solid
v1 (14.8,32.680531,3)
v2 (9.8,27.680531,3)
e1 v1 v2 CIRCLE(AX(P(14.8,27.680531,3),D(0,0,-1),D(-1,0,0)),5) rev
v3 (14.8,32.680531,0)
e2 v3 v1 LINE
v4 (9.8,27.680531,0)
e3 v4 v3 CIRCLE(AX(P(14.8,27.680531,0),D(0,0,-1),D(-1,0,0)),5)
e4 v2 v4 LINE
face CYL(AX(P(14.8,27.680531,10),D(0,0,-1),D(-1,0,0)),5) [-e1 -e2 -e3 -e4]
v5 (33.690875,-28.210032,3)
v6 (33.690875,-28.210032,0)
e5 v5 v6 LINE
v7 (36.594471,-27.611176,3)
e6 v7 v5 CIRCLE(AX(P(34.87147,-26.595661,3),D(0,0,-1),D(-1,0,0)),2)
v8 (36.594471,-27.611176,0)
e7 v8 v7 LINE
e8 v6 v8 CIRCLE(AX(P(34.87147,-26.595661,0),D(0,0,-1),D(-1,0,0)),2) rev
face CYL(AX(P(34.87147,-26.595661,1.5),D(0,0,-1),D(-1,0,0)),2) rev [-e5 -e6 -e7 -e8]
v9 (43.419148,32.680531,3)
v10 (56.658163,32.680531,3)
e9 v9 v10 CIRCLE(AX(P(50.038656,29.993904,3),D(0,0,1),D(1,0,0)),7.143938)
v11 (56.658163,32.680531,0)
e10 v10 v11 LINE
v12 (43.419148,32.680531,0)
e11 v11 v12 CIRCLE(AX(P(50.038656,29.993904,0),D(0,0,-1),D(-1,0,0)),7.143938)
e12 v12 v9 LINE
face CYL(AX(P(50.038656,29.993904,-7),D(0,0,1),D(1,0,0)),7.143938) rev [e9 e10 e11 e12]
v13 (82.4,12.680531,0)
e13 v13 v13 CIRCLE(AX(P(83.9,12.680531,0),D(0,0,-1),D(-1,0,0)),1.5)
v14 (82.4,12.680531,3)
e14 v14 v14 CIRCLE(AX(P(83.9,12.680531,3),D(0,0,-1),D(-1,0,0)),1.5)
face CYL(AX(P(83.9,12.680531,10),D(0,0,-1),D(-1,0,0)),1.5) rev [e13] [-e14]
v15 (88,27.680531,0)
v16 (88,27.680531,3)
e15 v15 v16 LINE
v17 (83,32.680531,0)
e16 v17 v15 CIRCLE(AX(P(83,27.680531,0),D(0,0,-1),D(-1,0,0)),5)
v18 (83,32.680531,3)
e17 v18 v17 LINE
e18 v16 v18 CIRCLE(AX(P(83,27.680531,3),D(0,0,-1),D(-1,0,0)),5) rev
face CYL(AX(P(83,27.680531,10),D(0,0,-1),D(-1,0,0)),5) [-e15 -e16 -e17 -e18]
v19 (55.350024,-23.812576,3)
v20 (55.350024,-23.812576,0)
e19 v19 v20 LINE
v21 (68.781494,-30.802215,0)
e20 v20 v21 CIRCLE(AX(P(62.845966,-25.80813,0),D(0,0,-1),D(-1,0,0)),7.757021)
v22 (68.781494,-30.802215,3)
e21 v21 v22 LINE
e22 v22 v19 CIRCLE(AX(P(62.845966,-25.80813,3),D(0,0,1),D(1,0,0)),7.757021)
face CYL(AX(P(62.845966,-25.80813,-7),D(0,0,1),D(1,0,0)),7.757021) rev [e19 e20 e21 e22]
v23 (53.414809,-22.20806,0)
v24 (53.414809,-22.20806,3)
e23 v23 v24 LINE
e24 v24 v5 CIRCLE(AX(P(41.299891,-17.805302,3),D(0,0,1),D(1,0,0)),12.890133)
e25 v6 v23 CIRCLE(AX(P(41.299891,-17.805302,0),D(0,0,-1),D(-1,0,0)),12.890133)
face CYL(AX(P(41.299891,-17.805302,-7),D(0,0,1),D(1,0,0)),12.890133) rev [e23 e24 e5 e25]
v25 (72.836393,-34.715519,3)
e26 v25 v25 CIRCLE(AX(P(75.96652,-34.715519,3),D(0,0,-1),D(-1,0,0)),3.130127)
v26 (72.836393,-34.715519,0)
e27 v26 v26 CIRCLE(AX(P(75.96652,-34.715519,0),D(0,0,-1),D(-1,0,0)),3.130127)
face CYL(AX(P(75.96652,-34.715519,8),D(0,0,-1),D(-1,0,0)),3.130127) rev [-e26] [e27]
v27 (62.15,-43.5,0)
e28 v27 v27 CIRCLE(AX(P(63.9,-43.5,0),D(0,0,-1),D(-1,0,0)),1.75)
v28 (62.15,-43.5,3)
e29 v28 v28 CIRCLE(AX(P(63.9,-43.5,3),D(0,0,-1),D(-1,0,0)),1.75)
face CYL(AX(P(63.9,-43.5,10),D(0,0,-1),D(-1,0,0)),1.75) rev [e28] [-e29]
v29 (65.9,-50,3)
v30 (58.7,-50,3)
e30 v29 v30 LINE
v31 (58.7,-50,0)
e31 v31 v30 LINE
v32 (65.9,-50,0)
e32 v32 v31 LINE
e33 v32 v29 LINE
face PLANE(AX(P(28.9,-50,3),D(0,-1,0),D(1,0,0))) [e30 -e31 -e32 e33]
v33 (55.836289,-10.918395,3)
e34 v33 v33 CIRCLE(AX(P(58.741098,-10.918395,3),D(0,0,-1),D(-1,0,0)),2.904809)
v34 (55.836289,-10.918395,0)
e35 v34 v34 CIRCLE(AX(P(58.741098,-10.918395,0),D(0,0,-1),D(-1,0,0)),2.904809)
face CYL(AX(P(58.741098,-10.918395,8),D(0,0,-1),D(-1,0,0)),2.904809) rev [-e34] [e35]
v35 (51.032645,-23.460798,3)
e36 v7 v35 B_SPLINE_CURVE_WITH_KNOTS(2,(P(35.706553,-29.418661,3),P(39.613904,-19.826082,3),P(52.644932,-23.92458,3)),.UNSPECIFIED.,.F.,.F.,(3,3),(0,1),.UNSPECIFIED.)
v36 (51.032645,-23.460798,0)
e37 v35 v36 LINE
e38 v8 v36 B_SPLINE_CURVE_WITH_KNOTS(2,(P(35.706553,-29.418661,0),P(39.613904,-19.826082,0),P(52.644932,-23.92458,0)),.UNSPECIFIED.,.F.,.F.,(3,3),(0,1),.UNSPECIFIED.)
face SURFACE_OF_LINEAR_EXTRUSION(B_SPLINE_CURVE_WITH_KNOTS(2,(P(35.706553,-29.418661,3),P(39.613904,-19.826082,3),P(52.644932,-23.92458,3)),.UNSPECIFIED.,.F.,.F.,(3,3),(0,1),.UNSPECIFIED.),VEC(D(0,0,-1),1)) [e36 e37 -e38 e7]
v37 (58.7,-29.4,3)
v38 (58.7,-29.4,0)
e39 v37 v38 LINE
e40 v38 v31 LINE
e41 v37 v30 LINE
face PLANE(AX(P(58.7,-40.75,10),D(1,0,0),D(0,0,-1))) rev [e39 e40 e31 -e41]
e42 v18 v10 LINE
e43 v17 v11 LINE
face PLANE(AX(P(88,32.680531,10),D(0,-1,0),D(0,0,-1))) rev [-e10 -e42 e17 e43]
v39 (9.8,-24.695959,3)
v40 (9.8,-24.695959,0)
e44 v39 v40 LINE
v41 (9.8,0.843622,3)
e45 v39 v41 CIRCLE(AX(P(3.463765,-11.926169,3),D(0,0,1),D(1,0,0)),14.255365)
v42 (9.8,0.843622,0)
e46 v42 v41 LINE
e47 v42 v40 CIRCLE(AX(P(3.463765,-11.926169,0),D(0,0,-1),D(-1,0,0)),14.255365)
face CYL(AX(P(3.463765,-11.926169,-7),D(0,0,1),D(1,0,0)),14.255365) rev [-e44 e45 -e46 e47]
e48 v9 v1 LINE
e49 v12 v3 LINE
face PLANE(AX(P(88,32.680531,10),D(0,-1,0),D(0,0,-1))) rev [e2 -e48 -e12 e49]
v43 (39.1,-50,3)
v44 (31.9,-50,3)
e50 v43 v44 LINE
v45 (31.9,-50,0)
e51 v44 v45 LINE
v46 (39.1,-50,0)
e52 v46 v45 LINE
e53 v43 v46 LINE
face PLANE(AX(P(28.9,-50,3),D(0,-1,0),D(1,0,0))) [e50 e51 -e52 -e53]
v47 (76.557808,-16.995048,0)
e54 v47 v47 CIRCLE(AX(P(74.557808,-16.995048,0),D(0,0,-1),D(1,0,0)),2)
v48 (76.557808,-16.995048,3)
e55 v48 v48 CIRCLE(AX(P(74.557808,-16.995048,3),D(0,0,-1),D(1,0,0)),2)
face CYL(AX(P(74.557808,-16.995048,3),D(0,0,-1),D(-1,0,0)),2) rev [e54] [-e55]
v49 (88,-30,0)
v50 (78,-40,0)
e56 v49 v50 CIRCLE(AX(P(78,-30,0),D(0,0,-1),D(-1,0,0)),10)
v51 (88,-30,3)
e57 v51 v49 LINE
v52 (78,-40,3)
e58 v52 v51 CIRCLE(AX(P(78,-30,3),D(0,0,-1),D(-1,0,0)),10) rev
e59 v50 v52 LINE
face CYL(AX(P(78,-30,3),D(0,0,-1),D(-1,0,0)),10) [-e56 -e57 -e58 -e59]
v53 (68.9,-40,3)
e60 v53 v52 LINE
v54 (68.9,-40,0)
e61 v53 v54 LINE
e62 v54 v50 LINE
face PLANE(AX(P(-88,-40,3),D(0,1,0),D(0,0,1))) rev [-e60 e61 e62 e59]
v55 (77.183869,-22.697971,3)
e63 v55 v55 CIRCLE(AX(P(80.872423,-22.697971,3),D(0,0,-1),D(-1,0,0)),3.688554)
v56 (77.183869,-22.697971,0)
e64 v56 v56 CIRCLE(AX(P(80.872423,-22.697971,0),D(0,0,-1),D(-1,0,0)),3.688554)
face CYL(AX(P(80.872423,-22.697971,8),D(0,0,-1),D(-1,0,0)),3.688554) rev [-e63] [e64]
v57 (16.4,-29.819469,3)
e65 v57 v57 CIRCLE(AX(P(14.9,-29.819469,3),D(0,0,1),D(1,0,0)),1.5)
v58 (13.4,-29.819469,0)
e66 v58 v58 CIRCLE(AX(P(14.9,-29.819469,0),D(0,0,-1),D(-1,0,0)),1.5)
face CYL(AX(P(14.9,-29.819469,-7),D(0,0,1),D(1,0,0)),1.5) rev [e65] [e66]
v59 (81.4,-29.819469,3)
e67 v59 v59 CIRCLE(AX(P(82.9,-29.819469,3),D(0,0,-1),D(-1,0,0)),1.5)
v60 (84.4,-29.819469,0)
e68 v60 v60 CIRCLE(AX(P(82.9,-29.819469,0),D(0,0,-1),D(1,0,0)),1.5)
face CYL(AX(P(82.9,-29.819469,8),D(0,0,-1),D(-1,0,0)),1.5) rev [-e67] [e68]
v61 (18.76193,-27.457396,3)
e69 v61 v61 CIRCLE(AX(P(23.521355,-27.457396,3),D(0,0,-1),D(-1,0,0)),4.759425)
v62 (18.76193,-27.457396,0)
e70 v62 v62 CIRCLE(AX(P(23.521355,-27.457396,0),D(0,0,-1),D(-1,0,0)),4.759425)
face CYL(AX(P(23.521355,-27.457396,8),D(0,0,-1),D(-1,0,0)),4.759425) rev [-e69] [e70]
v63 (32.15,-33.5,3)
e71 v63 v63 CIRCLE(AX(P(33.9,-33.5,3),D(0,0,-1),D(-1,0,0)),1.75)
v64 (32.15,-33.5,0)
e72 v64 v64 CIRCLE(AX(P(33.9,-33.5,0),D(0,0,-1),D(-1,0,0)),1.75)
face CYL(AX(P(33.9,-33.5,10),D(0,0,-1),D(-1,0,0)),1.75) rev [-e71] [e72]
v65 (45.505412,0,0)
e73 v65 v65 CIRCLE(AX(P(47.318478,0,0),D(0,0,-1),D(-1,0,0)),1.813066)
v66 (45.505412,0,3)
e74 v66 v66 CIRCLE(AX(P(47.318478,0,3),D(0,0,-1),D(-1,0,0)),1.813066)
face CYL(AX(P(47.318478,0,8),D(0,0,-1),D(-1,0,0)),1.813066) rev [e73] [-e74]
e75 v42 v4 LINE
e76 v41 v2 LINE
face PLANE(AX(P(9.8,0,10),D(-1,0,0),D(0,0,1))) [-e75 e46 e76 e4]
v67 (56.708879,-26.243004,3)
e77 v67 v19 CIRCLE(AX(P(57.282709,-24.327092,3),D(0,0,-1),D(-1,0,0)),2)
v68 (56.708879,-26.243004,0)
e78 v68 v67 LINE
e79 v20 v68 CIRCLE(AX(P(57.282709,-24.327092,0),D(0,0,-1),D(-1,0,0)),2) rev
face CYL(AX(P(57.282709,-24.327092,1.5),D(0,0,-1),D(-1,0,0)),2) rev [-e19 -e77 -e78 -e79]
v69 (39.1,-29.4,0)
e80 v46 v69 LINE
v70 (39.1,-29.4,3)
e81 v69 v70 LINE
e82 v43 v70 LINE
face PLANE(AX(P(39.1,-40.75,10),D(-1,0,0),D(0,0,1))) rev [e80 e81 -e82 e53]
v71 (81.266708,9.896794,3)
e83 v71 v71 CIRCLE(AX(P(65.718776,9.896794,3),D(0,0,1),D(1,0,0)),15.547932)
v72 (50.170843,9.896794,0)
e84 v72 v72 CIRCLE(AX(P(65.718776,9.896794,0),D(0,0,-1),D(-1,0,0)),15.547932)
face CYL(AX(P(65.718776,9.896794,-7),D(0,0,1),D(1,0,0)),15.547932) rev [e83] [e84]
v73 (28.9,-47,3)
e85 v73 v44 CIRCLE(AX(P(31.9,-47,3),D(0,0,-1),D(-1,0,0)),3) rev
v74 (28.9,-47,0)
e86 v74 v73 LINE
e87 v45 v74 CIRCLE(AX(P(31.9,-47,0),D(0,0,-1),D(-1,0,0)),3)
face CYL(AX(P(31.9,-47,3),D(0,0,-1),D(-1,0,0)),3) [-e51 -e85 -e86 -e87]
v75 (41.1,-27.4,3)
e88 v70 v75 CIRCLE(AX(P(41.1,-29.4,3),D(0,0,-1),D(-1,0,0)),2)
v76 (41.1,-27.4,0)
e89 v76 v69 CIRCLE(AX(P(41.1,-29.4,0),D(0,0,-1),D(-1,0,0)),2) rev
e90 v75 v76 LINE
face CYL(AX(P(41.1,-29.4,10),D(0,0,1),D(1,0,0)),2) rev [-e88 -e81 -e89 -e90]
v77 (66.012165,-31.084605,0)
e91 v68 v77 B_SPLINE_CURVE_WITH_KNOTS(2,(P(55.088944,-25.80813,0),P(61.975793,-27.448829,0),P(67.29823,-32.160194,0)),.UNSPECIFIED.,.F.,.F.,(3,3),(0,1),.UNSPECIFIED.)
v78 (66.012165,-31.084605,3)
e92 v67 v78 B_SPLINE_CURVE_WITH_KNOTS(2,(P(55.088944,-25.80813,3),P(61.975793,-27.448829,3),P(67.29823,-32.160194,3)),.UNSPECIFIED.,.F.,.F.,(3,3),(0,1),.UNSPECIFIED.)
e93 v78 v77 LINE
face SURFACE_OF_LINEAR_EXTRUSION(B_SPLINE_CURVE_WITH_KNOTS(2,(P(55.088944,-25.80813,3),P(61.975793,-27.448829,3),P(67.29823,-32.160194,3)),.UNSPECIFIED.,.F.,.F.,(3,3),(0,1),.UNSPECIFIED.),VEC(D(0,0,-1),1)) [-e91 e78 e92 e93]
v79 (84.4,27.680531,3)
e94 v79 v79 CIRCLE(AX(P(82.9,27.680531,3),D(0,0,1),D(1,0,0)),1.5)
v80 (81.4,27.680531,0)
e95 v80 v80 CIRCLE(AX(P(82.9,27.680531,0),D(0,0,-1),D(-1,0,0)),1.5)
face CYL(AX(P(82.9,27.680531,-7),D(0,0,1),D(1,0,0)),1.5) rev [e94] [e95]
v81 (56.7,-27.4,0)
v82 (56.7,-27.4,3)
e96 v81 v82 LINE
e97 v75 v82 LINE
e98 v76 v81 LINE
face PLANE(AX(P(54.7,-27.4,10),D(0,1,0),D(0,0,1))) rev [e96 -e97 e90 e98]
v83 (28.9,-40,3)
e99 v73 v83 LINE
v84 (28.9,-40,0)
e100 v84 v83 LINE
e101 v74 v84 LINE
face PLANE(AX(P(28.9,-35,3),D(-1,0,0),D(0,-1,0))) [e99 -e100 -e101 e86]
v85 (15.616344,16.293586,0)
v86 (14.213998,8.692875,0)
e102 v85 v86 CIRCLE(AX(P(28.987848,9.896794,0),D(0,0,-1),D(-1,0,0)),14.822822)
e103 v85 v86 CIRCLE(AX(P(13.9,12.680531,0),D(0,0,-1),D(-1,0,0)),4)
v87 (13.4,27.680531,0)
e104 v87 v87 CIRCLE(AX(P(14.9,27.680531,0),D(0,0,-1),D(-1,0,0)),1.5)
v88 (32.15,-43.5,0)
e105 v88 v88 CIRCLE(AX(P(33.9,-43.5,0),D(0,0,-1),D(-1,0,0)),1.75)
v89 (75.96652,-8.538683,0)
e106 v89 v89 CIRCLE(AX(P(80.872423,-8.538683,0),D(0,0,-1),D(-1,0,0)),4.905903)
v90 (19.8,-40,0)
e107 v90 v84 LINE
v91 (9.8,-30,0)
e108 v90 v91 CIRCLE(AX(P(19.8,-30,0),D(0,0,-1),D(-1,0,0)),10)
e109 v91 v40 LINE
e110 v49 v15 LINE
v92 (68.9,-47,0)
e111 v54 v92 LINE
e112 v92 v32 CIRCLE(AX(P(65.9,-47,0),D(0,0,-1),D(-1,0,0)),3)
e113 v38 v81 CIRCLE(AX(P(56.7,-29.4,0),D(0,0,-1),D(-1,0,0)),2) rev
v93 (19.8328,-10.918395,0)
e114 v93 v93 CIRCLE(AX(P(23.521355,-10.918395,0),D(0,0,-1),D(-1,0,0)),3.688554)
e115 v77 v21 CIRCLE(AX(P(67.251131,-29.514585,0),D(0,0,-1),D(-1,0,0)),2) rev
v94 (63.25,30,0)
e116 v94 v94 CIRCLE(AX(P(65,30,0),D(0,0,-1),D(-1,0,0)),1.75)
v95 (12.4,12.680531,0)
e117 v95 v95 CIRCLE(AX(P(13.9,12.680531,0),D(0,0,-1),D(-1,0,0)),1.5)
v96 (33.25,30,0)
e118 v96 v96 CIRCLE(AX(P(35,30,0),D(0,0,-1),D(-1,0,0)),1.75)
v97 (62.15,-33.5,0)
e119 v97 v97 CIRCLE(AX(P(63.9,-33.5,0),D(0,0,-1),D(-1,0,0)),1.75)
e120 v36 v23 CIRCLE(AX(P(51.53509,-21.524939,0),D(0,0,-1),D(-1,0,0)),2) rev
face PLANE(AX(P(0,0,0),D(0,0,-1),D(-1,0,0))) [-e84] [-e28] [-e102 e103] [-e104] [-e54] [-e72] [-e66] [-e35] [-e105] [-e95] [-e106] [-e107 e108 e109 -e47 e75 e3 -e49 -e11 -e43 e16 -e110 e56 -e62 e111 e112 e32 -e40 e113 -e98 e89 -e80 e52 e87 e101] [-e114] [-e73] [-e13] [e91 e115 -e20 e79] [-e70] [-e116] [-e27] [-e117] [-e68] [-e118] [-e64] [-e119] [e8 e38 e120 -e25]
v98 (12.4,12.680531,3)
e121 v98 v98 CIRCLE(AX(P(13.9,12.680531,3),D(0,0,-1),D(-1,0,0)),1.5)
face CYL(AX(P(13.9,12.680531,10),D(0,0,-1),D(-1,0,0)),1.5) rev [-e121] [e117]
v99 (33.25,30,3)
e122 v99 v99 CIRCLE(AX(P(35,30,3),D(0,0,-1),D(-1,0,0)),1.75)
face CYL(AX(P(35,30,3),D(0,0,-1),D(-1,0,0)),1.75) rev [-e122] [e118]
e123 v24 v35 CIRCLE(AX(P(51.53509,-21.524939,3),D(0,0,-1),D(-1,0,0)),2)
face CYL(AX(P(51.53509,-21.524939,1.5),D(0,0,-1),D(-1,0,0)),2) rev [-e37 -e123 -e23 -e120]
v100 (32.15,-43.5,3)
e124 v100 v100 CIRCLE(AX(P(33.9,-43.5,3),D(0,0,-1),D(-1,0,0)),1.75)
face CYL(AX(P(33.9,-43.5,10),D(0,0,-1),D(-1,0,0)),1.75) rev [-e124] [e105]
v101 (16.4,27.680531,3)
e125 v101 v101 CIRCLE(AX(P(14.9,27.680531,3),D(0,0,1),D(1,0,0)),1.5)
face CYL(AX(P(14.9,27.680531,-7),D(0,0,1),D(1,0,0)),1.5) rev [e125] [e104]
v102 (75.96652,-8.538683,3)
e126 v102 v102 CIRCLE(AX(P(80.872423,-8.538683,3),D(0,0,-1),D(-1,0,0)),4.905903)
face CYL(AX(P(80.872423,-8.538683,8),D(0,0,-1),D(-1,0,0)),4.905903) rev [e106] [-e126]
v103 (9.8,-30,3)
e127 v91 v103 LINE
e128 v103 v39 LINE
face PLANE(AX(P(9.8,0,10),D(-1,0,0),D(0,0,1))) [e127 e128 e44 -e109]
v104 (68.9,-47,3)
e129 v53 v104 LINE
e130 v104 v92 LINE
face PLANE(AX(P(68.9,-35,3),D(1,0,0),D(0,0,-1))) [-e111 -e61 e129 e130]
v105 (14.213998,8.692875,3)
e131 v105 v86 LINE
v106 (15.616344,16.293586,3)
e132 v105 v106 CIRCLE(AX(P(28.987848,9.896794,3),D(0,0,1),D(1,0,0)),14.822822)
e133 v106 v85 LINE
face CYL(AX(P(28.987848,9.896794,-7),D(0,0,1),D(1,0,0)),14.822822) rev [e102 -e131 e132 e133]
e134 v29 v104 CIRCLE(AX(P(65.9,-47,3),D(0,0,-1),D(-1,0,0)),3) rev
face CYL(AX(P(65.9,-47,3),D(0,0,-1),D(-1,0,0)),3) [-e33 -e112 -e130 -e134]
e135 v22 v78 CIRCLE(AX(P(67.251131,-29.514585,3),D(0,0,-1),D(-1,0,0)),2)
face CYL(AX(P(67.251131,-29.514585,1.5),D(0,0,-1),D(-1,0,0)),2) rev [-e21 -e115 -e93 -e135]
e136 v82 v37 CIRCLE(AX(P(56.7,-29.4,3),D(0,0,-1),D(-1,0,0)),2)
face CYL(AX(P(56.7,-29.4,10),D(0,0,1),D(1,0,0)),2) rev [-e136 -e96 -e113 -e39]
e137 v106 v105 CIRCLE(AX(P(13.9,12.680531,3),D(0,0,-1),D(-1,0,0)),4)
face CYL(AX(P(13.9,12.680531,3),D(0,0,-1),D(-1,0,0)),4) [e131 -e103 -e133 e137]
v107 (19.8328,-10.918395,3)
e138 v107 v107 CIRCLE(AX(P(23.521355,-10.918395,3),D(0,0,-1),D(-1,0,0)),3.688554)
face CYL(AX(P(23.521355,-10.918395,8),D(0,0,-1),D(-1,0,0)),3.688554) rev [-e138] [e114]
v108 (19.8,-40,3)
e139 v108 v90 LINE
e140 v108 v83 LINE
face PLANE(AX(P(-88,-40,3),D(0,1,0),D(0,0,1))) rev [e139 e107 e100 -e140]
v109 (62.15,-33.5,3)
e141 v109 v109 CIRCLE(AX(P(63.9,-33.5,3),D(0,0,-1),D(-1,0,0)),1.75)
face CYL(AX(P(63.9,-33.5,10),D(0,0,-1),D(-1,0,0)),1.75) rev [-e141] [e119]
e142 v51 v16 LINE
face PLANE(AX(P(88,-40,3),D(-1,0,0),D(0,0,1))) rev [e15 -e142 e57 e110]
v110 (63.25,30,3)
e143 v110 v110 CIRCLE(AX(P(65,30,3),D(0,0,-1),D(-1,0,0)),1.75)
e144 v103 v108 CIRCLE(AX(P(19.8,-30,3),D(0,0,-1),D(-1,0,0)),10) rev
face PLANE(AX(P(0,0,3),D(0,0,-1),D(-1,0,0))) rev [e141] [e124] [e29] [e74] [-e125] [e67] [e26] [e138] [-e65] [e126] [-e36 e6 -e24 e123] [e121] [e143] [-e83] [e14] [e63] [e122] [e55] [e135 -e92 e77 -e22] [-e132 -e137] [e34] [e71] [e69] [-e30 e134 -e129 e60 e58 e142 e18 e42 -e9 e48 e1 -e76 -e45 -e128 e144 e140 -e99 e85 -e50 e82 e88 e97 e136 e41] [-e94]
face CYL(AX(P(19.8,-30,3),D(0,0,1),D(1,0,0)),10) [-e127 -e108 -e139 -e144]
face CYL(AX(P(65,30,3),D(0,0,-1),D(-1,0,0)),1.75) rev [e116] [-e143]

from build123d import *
from OCP.BRepFilletAPI import BRepFilletAPI_MakeChamfer

# Parameters (mm, degrees)
SKETCH_1_W           = 176
SKETCH_1_H           = 80
EXTRUDE_1_DEPTH      = 3
SKETCH_2_R           = 1.75
CUT_EXTRUDE_1_DEPTH  = 3
SKETCH_3_R           = 2
CUT_EXTRUDE_2_DEPTH  = 3
FILLET_2_SIZE        = 40
FILLET_2_SIZE_2      = 20
FILLET_3_R           = 10
SKETCH_7_W           = 46
SKETCH_7_H           = 25
EXTRUDE_2_DEPTH      = 3
SKETCH_8_R           = 1.75
CUT_EXTRUDE_5_DEPTH  = 10
SKETCH_9_R           = 1.5
CUT_EXTRUDE_6_DEPTH  = 10
SKETCH_12_R          = 1.5
CUT_EXTRUDE_9_DEPTH  = 4
SKETCH_10_R          = 14.822822372
SKETCH_10_R_2        = 15.54793228
SKETCH_10_R_3        = 12.890133266
SKETCH_10_R_4        = 7.757021253
SKETCH_10_R_5        = 6.934601812
SKETCH_10_R_6        = 7.029600784
SKETCH_10_R_7        = 7.14393757
SKETCH_10_R_8        = 6.581917706
SKETCH_10_R_9        = 14.255365134
SKETCH_10_R_10       = 5.884344846
SKETCH_10_W          = 50
SKETCH_10_H          = 42
CUT_EXTRUDE_10_DEPTH = 10
FILLET_4_R           = 10
SKETCH_13_W          = 107.593343732
SKETCH_13_H          = 96.683988594
CUT_EXTRUDE_11_DEPTH = 10
FILLET_5_R           = 10
SKETCH_15_W          = 40
SKETCH_15_H          = 15
EXTRUDE_4_DEPTH      = 3
FILLET_8_R           = 3
SKETCH_16_R          = 1.75
CUT_EXTRUDE_12_DEPTH = 10
CUT_EXTRUDE_13_DEPTH = 10
EXTRUDE_START        = -3
EXTRUDE_5_DEPTH      = 3
FILLET_9_R           = 2
FILLET_10_R          = 2
SKETCH_20_W          = 78.200000008
SKETCH_20_H          = 3
EXTRUDE_6_DEPTH      = 10
SKETCH_21_R          = 1.5
CUT_EXTRUDE_14_DEPTH = 8
CHAMFER_1_SIZE       = 8
CHAMFER_1_SIZE2      = 13.856406461
CUT_EXTRUDE_START    = -8
SKETCH_23_R          = 1.5
CUT_EXTRUDE_15_DEPTH = 8
SKETCH_24_R          = 4.905902743
SKETCH_24_R_2        = 2.904809147
SKETCH_24_R_3        = 3.688554183
SKETCH_24_R_4        = 4.759424753
SKETCH_24_R_5        = 3.130126802
SKETCH_24_R_6        = 1.813066271
CUT_EXTRUDE_16_DEPTH = 8
SKETCH_25_W          = 83.904455519
SKETCH_25_H          = 24.388420685
CUT_EXTRUDE_17_DEPTH = 10
FILLET_11_R          = 5
SKETCH_26_R          = 1.5
CUT_EXTRUDE_18_DEPTH = 10
EXTRUDE_7_DEPTH      = 3


with BuildPart() as part:
    # 草图1 → 凸台-拉伸1 (new body)
    with BuildSketch(Plane.XY):
        Rectangle(SKETCH_1_W, SKETCH_1_H)
    extrude(amount=EXTRUDE_1_DEPTH)

    # 草图2 → 切除-拉伸1 (cut)
    with BuildSketch(Plane(origin=(0, 0, 0), x_dir=(-1, 0, 0), z_dir=(0, 0, -1))):
        with Locations((65, 30)):
            Circle(SKETCH_2_R)
        with Locations((35, 30)):
            Circle(SKETCH_2_R)
        with Locations((-35, 30)):
            Circle(SKETCH_2_R)
        with Locations((-65, 30)):
            Circle(SKETCH_2_R)
        Polygon((77.028594491, 36.791653669), (56.939180126, 54.369891239), (101.028594491, 54.369891239), (101.028594491, 15.791653669), align=None)
        Polygon((-23, 40.742269916), (-23, 20.742269916), (-23, 17.742269916), (-23, 15), (23, 15), (23, 17.742269916), (23, 20), (23, 40), align=None)
    extrude(amount=-CUT_EXTRUDE_1_DEPTH, mode=Mode.SUBTRACT)

    # 草图3 → 切除-拉伸2 (cut)
    with BuildSketch(Plane(origin=(0, 0, 0), x_dir=(-1, 0, 0), z_dir=(0, 0, -1))):
        with Locations(Location((-74.557808033, -16.995048107, 0), (0, 0, 180))):
            Circle(SKETCH_3_R)
    extrude(amount=-CUT_EXTRUDE_2_DEPTH, mode=Mode.SUBTRACT)

    # 圆角2
    # an asymmetric fillet: 40, 20 mm, written as the material it takes off along each edge
    with BuildSketch(Plane(origin=(-88, -40, -100), x_dir=(1, 0, 0), z_dir=(0, 0, 1))) as fillet_2_piece_1:
        with BuildLine():
            Bezier((FILLET_2_SIZE, 0), (0, 0), (0, FILLET_2_SIZE_2), weights=[1, 0.707106781, 1])
            Line((0, FILLET_2_SIZE_2), (0, 0))
            Line((0, 0), (FILLET_2_SIZE, 0))
        make_face()
    extrude(amount=203, mode=Mode.SUBTRACT)

    # 圆角3
    fillet_3_edges = [part.edges().sort_by_distance(p)[0] for p in [
        (88, -40, 1.5),
    ]]
    fillet(fillet_3_edges, radius=FILLET_3_R)

    # 草图7 → 凸台-拉伸2 (add)
    with BuildSketch(Plane.XY.offset(3)):
        with Locations((0, 27.5)):
            Rectangle(SKETCH_7_W, SKETCH_7_H)
    extrude(amount=-EXTRUDE_2_DEPTH)

    # 草图8 → 切除-拉伸5 (cut)
    with BuildSketch(Plane.XY.offset(3)):
        with Locations((-15.600000004, -14.741858523)):
            Circle(SKETCH_8_R)
        with Locations((-15.600000004, -0.741858523)):
            Circle(SKETCH_8_R)
        with Locations((-76.600000004, -14.741858523)):
            Circle(SKETCH_8_R)
        with Locations((-76.600000004, -0.741858523)):
            Circle(SKETCH_8_R)
    extrude(amount=-CUT_EXTRUDE_5_DEPTH, mode=Mode.SUBTRACT)

    # 草图9 → 切除-拉伸6 (cut)
    with BuildSketch(Plane.XY.offset(3)):
        with Locations((14.899999996, 27.680531328)):
            Circle(SKETCH_9_R)
        with Locations((14.899999996, -29.819468672)):
            Circle(SKETCH_9_R)
        with Locations((82.899999996, 27.680531328)):
            Circle(SKETCH_9_R)
    extrude(amount=-CUT_EXTRUDE_6_DEPTH, mode=Mode.SUBTRACT)

    # 草图12 → 切除-拉伸9 (cut)
    with BuildSketch(Plane(origin=(0, 0, 0), x_dir=(-1, 0, 0), z_dir=(0, 0, -1))):
        with Locations((6.36299939, -26)):
            Circle(SKETCH_12_R)
        with Locations((6.36299939, -36)):
            Circle(SKETCH_12_R)
        with Locations((36.36299939, -26)):
            Circle(SKETCH_12_R)
        with Locations((36.36299939, -36)):
            Circle(SKETCH_12_R)
    extrude(amount=-CUT_EXTRUDE_9_DEPTH, mode=Mode.SUBTRACT)

    # 草图10 → 切除-拉伸10 (cut)
    with BuildSketch(Plane.XY.offset(3)):
        with Locations((28.987847861, 9.896794242)):
            Circle(SKETCH_10_R)
        with Locations((65.718775612, 9.896794242)):
            Circle(SKETCH_10_R_2)
        with Locations((41.299890682, -17.805302107)):
            Circle(SKETCH_10_R_3)
        with Locations((62.84596562, -25.808129941)):
            Circle(SKETCH_10_R_4)
        with Locations((-21.047385867, 29.993904331)):
            Circle(SKETCH_10_R_5)
        with Locations((1.160652102, 29.993904331)):
            Circle(SKETCH_10_R_6)
        with Locations((50.038655847, 29.993904331)):
            Circle(SKETCH_10_R_7)
        with Locations((-49.899983992, 31.034790405)):
            Circle(SKETCH_10_R_8)
        with Locations((3.463764683, -11.926168688)):
            Circle(SKETCH_10_R_9)
        with Locations((-5.845999613, 14.761822293)):
            Circle(SKETCH_10_R_10)
        with Locations((-46.100000004, -7.741858523)):
            Rectangle(SKETCH_10_W, SKETCH_10_H)
    extrude(amount=-CUT_EXTRUDE_10_DEPTH, mode=Mode.SUBTRACT)

    # 圆角4
    fillet_4_edges = [part.edges().sort_by_distance(p)[0] for p in [
        (-21.100000004, 13.258141477, 1.5),
        (-21.100000004, -28.741858523, 1.5),
        (-71.100000004, -28.741858523, 1.5),
        (-71.100000004, 13.258141477, 1.5),
    ]]
    fillet(fillet_4_edges, radius=FILLET_4_R)

    # 草图13 → 切除-拉伸11 (cut)
    with BuildSketch(Plane(origin=(0, 0, 0), x_dir=(-1, 0, 0), z_dir=(0, 0, -1))):
        with Locations((43.996671874, -8.341994297)):
            Rectangle(SKETCH_13_W, SKETCH_13_H)
    extrude(amount=-CUT_EXTRUDE_11_DEPTH, mode=Mode.SUBTRACT)

    # 圆角5
    fillet_5_edges = [part.edges().sort_by_distance(p)[0] for p in [
        (9.799999992, -40, 1.5),
    ]]
    fillet(fillet_5_edges, radius=FILLET_5_R)

    # 草图15 → 凸台-拉伸4 (add)
    with BuildSketch(Plane(origin=(0, 0, 0), x_dir=(-1, 0, 0), z_dir=(0, 0, -1))):
        with Locations((-48.899999996, -42.5)):
            Rectangle(SKETCH_15_W, SKETCH_15_H)
    extrude(amount=-EXTRUDE_4_DEPTH)

    # 圆角8
    fillet_8_edges = [part.edges().sort_by_distance(p)[0] for p in [
        (68.899999996, -50, 1.5),
        (28.899999996, -50, 1.5),
    ]]
    fillet(fillet_8_edges, radius=FILLET_8_R)

    # 草图16 → 切除-拉伸12 (cut)
    with BuildSketch(Plane(origin=(0, 0, 0), x_dir=(-1, 0, 0), z_dir=(0, 0, -1))):
        with Locations((-63.899999996, -33.5)):
            Circle(SKETCH_16_R)
        with Locations((-33.899999996, -43.5)):
            Circle(SKETCH_16_R)
        with Locations((-63.899999996, -43.5)):
            Circle(SKETCH_16_R)
        with Locations((-33.899999996, -33.5)):
            Circle(SKETCH_16_R)
    extrude(amount=-CUT_EXTRUDE_12_DEPTH, mode=Mode.SUBTRACT)

    # 草图17 → 切除-拉伸13 (cut)
    with BuildSketch(Plane(origin=(0, 0, 0), x_dir=(-1, 0, 0), z_dir=(0, 0, -1))):
        Polygon((-39.099999996, -40.75), (-39.099999996, -55.483029853), (-58.699999996, -55.483029853), (-58.699999996, -40.75), (-58.699999996, -27.4), (-54.699999996, -27.4), (-43.099999996, -27.4), (-39.099999996, -27.4), align=None)
    extrude(amount=-CUT_EXTRUDE_13_DEPTH, mode=Mode.SUBTRACT)

    # 草图18 → 凸台-拉伸5 (add)
    with BuildSketch(Plane(origin=(0, 0, 0), x_dir=(-1, 0, 0), z_dir=(0, 0, -1)).offset(EXTRUDE_START)):
        with BuildLine():
            Line((-58.699999996, -27.4), (-55.254040408, -27.4))
            ThreePointArc((-55.254040408, -27.4), (-55.130328772, -26.608334131), (-55.088944367, -25.808129941))
            add(Edge.make_bspline(
                [(-67.298229637, -32.160194474), (-61.975792576, -27.448828616), (-55.088944367, -25.808129941)],
                knots=[0, 0, 0, 1, 1, 1], degree=2))
            ThreePointArc((-67.298229637, -32.160194474), (-66.474383914, -32.664219161), (-65.594291299, -33.061962354))
            ThreePointArc((-65.594291299, -33.061962354), (-63.662413835, -31.766202775), (-62.150328303, -33.533896403))
            ThreePointArc((-62.150328303, -33.533896403), (-60.35552106, -33.154493981), (-58.699999996, -32.364222356))
            Line((-58.699999996, -32.364222356), (-58.699999996, -27.4))
        make_face()
        with BuildLine():
            Line((-49.907870001, -27.4), (-39.099999996, -27.4))
            Line((-39.099999996, -27.4), (-39.099999996, -30.506326341))
            ThreePointArc((-39.099999996, -30.506326341), (-37.365509299, -30.080324663), (-35.706552784, -29.418661086))
            add(Edge.make_bspline(
                [(-52.644932329, -23.924580303), (-39.613903701, -19.826081503), (-35.706552784, -29.418661086)],
                knots=[0, 0, 0, 1, 1, 1], degree=2))
            ThreePointArc((-52.644932329, -23.924580303), (-51.426607669, -25.780585091), (-49.907870001, -27.4))
        make_face()
    extrude(amount=EXTRUDE_5_DEPTH)

    # 圆角9
    fillet_9_edges = [part.edges().sort_by_distance(p)[0] for p in [
        (58.699999996, -27.4, 1.5),
        (39.099999996, -27.4, 1.5),
    ]]
    fillet(fillet_9_edges, radius=FILLET_9_R)

    # 圆角10
    fillet_10_edges = [part.edges().sort_by_distance(p)[0] for p in [
        (35.706552784, -29.418661086, 1.5),
        (52.644932329, -23.924580303, 1.5),
        (55.088944367, -25.808129941, 1.5),
        (67.298229637, -32.160194474, 1.5),
    ]]
    fillet(fillet_10_edges, radius=FILLET_10_R)

    # 草图20 → 凸台-拉伸6 (add)
    with BuildSketch(Plane(origin=(0, 40, 0), x_dir=(1, 0, 0), z_dir=(0, 1, 0))):
        with Locations((48.899999996, -1.5)):
            Rectangle(SKETCH_20_W, SKETCH_20_H)
    extrude(amount=EXTRUDE_6_DEPTH)

    # 草图21 → 切除-拉伸14 (cut)
    with BuildSketch(Plane(origin=(0, 0, 0), x_dir=(-1, 0, 0), z_dir=(0, 0, -1))):
        with Locations((-13.899999996, 40)):
            Circle(SKETCH_21_R)
        with Locations((-83.899999996, 40)):
            Circle(SKETCH_21_R)
    extrude(amount=-CUT_EXTRUDE_14_DEPTH, mode=Mode.SUBTRACT)

    # 倒角1: one chamfer whose edges measure the first distance from different faces: ONE call of the kernel's chamfer builder (chamfer() names one face for all edges)
    chamfer_1_edges_1 = [part.edges().sort_by_distance(p)[0] for p in [
        (9.799999992, 50, 1.5),
    ]]
    chamfer_1_side_1 = [part.faces().sort_by_distance(p)[0] for p in [
        (9.799999992, 25.421811059, 1.5),
    ]]
    chamfer_1_edges_2 = [part.edges().sort_by_distance(p)[0] for p in [
        (88, 50, 1.5),
    ]]
    chamfer_1_side_2 = [part.faces().sort_by_distance(p)[0] for p in [
        (88, 10, 1.5),
    ]]
    chamfer_1 = BRepFilletAPI_MakeChamfer(part.part.solid().wrapped)
    for e in chamfer_1_edges_1:
        chamfer_1.Add(CHAMFER_1_SIZE, CHAMFER_1_SIZE2, e.wrapped, chamfer_1_side_1[0].wrapped)  # the first distance lies on this face
    for e in chamfer_1_edges_2:
        chamfer_1.Add(CHAMFER_1_SIZE, CHAMFER_1_SIZE2, e.wrapped, chamfer_1_side_2[0].wrapped)  # the first distance lies on this face
    add(Compound.cast(chamfer_1.Shape()), mode=Mode.REPLACE)

    # 草图23 → 切除-拉伸15 (cut)
    with BuildSketch(Plane(origin=(0, 0, 0), x_dir=(-1, 0, 0), z_dir=(0, 0, -1)).offset(CUT_EXTRUDE_START)):
        with Locations(Location((-14.899999996, -29.819468672, 0), (0, 0, 180))):
            Circle(SKETCH_23_R)
        with Locations((-82.899999996, -29.819468672)):
            Circle(SKETCH_23_R)
    extrude(amount=CUT_EXTRUDE_15_DEPTH, mode=Mode.SUBTRACT)

    # 草图24 → 切除-拉伸16 (cut)
    with BuildSketch(Plane(origin=(0, 0, 0), x_dir=(-1, 0, 0), z_dir=(0, 0, -1))):
        with Locations((-80.872422916, -8.538682567)):
            Circle(SKETCH_24_R)
        with Locations((-58.741097816, -10.918394943)):
            Circle(SKETCH_24_R_2)
        with Locations((-23.521354645, -10.918394943)):
            Circle(SKETCH_24_R_3)
        with Locations((-23.521354645, -27.457395959)):
            Circle(SKETCH_24_R_4)
        with Locations((-75.966520173, -34.715518707)):
            Circle(SKETCH_24_R_5)
        with Locations((-80.872422916, -22.697971206)):
            Circle(SKETCH_24_R_3)
        with Locations((-47.318478409, 0)):
            Circle(SKETCH_24_R_6)
    extrude(amount=-CUT_EXTRUDE_16_DEPTH, mode=Mode.SUBTRACT)

    # 草图25 → 切除-拉伸17 (cut)
    with BuildSketch(Plane(origin=(0, 0, 0), x_dir=(-1, 0, 0), z_dir=(0, 0, -1))):
        with Locations((-46.047772241, 44.874741671)):
            Rectangle(SKETCH_25_W, SKETCH_25_H)
    extrude(amount=-CUT_EXTRUDE_17_DEPTH, mode=Mode.SUBTRACT)

    # 圆角11
    fillet_11_edges = [part.edges().sort_by_distance(p)[0] for p in [
        (9.799999992, 32.680531328, 1.5),
        (88, 32.680531328, 1.5),
    ]]
    fillet(fillet_11_edges, radius=FILLET_11_R)

    # 草图26 → 切除-拉伸18 (cut)
    with BuildSketch(Plane(origin=(0, 0, 0), x_dir=(-1, 0, 0), z_dir=(0, 0, -1))):
        with Locations((-83.899999996, 12.680531328)):
            Circle(SKETCH_26_R)
        with Locations((-13.899999996, 12.680531328)):
            Circle(SKETCH_26_R)
    extrude(amount=-CUT_EXTRUDE_18_DEPTH, mode=Mode.SUBTRACT)

    # 草图27 → 凸台-拉伸7 (add)
    with BuildSketch(Plane(origin=(0, 0, 0), x_dir=(-1, 0, 0), z_dir=(0, 0, -1)).offset(EXTRUDE_START)):
        with BuildLine():
            ThreePointArc((-14.725176393, 13.933162125), (-15.375103135, 12.408371948), (-14.223837257, 11.215905291))
            ThreePointArc((-14.223837257, 11.215905291), (-14.165138203, 9.954599731), (-14.213997961, 8.692874713))
            ThreePointArc((-14.213997961, 8.692874713), (-17.833608368, 11.954772982), (-15.616343872, 16.29358595))
            ThreePointArc((-15.616343872, 16.29358595), (-15.120446754, 15.132369629), (-14.725176393, 13.933162125))
        make_face()
    extrude(amount=EXTRUDE_7_DEPTH)


solid = part.part
